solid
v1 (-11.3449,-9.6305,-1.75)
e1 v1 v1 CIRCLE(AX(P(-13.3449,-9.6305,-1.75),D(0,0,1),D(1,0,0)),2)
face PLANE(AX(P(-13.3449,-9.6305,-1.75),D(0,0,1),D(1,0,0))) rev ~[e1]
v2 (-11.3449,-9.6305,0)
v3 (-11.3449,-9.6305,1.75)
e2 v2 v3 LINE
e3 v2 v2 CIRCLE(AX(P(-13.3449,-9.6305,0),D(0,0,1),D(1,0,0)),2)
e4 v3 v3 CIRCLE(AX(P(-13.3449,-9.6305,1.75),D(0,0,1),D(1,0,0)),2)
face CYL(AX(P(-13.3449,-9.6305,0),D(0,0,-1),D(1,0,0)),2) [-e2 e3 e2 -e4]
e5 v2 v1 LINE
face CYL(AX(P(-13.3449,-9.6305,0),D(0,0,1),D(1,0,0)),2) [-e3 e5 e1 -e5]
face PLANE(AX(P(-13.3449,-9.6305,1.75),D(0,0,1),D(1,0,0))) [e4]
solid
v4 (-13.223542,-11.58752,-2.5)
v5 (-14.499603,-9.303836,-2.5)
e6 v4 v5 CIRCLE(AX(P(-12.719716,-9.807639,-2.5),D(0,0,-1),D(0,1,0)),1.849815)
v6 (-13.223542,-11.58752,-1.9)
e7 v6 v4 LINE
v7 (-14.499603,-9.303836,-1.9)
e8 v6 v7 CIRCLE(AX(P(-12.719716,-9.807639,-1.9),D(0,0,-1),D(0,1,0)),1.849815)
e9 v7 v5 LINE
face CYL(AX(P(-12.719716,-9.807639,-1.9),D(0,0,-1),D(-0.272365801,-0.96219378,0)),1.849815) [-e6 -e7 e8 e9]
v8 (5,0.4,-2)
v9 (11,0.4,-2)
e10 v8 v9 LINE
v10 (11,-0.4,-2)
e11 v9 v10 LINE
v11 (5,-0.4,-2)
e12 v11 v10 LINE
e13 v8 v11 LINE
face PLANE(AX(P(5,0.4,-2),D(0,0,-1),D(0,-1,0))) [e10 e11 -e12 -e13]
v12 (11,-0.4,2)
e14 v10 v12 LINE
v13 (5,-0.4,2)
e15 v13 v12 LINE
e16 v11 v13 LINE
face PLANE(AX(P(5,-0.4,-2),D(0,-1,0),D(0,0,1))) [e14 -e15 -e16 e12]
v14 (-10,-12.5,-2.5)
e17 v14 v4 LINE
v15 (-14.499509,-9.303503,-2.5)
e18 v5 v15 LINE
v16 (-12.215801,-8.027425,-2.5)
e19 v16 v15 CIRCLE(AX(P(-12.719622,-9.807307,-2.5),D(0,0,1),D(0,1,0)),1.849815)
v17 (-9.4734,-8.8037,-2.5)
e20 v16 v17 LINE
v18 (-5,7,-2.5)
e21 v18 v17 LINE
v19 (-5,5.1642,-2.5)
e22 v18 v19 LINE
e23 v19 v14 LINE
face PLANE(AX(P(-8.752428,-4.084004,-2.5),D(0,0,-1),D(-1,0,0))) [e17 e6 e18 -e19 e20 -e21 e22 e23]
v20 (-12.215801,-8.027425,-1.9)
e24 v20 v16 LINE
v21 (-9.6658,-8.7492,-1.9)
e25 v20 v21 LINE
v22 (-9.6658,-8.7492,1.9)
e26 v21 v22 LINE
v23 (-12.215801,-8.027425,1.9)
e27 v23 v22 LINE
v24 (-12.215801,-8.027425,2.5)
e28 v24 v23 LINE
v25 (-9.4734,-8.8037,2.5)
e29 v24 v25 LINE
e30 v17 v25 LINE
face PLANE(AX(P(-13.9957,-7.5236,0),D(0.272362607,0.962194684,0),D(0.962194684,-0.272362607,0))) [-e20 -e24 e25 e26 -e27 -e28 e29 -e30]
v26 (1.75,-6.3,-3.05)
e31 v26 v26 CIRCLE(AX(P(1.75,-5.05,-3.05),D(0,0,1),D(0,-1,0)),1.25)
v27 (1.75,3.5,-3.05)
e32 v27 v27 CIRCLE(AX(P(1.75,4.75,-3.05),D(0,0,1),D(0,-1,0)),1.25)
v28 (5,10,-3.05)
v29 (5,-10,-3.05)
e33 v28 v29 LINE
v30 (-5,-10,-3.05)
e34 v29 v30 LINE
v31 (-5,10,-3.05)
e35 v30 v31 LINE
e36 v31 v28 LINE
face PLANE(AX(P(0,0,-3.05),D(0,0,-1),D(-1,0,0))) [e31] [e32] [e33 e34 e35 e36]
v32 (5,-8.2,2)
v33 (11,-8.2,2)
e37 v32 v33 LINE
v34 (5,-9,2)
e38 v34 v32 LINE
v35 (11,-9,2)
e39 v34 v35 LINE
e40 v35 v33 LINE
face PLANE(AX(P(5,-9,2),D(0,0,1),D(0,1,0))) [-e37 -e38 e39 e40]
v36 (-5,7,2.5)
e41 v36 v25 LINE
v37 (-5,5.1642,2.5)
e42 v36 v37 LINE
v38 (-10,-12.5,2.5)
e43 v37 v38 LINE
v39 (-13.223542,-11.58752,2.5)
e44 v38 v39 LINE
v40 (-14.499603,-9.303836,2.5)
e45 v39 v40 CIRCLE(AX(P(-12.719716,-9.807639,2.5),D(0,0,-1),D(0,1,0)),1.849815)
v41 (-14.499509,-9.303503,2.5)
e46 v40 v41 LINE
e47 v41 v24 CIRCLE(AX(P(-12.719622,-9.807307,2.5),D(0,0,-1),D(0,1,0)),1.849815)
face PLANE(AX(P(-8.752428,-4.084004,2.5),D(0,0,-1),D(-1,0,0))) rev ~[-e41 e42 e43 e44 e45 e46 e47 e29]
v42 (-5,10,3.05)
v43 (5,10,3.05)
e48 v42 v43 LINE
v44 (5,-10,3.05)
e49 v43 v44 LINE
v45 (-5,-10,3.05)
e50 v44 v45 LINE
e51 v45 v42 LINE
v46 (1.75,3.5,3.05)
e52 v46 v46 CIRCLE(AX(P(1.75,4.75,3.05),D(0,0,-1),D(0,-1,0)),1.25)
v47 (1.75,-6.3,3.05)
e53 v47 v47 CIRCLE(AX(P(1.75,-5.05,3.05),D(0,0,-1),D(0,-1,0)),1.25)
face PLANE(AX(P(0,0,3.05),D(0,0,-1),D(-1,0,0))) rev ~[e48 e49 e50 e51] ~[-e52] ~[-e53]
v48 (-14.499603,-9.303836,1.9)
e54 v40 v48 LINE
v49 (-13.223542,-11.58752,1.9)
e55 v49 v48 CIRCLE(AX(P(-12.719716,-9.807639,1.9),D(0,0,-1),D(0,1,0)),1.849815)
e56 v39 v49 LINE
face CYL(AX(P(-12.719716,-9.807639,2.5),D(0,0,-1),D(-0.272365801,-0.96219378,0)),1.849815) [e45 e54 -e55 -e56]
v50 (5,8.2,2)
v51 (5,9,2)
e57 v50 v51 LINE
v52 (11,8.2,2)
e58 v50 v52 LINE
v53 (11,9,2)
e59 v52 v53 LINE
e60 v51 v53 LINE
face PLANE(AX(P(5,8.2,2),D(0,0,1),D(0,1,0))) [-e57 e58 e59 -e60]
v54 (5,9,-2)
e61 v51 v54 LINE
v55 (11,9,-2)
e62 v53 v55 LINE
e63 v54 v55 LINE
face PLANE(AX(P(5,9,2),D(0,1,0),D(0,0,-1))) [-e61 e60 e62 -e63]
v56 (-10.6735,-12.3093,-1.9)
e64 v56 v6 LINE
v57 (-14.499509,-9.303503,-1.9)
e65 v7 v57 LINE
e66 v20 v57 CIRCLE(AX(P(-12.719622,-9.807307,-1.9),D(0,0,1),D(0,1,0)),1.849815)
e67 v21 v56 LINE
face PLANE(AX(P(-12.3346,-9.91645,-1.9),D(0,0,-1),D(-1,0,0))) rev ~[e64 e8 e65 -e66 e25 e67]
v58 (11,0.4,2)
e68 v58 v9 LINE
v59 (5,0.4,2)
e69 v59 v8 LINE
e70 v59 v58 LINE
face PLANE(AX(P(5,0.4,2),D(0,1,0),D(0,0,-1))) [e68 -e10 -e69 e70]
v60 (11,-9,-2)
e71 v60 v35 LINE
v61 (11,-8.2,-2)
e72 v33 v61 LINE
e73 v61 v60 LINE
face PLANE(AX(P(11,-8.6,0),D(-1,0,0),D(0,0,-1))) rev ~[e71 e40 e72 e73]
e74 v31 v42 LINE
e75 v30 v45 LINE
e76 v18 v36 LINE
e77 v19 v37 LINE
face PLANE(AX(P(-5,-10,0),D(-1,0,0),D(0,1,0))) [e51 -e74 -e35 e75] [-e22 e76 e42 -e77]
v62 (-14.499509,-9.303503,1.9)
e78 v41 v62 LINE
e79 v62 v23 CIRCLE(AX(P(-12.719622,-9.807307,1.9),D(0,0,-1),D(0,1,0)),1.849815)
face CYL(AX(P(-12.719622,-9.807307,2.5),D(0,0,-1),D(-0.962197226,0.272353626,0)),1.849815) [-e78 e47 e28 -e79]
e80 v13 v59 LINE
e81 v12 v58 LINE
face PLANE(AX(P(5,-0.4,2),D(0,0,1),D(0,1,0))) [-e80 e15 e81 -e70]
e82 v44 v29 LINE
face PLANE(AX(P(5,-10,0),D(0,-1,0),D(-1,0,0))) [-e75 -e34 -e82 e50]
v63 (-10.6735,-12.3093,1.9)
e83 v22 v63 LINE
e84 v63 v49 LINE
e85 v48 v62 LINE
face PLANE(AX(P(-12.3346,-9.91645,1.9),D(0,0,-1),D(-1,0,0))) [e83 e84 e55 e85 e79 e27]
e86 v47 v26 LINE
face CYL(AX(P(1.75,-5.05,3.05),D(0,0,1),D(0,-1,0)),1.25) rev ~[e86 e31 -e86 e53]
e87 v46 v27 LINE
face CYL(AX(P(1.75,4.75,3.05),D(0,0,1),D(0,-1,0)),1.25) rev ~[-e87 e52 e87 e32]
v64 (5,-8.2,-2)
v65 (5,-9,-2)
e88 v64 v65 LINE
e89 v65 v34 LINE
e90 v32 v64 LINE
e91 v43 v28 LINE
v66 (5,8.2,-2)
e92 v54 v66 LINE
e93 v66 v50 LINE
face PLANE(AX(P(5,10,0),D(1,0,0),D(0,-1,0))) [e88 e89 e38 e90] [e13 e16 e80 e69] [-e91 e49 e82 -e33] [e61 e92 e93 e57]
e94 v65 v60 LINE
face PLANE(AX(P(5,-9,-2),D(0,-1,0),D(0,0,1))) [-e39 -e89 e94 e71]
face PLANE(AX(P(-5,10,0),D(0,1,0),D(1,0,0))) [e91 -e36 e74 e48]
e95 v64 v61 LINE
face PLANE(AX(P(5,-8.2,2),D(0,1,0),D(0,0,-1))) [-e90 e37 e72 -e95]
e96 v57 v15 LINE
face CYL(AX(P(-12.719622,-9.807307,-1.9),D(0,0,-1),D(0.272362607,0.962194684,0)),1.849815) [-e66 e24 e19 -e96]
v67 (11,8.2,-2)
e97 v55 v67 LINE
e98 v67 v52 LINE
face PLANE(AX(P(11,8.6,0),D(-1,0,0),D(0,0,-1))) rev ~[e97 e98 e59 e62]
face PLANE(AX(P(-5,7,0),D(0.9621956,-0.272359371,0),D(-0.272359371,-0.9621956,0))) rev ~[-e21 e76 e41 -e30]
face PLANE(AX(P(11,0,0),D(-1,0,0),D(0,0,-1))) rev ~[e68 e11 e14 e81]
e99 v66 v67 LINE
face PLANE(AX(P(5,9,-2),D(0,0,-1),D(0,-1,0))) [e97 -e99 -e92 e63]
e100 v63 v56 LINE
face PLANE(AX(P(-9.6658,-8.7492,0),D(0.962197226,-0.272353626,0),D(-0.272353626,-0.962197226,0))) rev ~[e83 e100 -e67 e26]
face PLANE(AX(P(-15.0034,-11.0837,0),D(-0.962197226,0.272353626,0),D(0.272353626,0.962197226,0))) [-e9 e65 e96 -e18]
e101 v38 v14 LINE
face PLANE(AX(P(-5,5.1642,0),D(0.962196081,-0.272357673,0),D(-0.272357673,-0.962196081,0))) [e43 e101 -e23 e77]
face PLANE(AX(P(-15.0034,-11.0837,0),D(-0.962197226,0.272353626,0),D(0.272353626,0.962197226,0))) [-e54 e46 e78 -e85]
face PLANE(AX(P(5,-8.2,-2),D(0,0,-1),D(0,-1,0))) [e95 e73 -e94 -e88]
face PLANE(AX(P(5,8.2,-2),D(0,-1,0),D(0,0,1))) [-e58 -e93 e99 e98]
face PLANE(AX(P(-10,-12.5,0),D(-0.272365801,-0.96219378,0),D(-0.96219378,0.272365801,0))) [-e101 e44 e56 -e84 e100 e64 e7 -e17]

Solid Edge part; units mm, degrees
sketch "Sketch1" plane through (0, 0, 0) normal (0, 0, 1) x (1, 0, 0)
  line L0 (-5, 10) -> (5, 10)
  line L1 (5, 10) -> (5, -10)
  line L2 (5, -10) -> (-5, -10)
  line L3 (-5, -10) -> (-5, 10)
  dimension "D1" = 10
  dimension "D2" = 20
extrude "Protrusion1" add sketch "Sketch1" along normal mid plane 6.1
sketch "Sketch2" plane through (0, 0, 0) normal (0, 0, 1) x (1, 0, 0)
  line L0 (-5, 5.1642) -> (-10, -12.5)
  line L1 (-10, -12.5) -> (-15.0034, -11.0837)
  line L2 (-15.0034, -11.0837) -> (-13.9957, -7.5236)
  line L3 (-13.9957, -7.5236) -> (-9.4734, -8.8037)
  line L4 (-5, 7) -> (-9.4734, -8.8037)
  line L5 (-5, 7) -> (-5, 5.1642)
  dimension "D1" = 0.5
  dimension "D2" = 5
  dimension "D3" = 5.2
  dimension "D4" = 3.7
  dimension "D5" = 3
  dimension "D6" = 19.5
  dimension "D7" = 2.5
extrude "Extrusionsausprägung_2" add sketch "Sketch2" along normal mid plane 5
sketch "Sketch3" plane through (0, 0, 0) normal (0, 0, 1) x (1, 0, 0)
  line L0 (-9.6658, -8.7492) -> (-10.6735, -12.3093)
  line L1 (-10.6735, -12.3093) -> (-15.0034, -11.0837)
  line L2 (-15.0034, -11.0837) -> (-13.9957, -7.5236)
  line L3 (-13.9957, -7.5236) -> (-9.6658, -8.7492)
  dimension "D1" = 4.5
extrude "Extrusionsausschnitt_1" cut sketch "Sketch3" along normal mid plane 3.8
sketch "Sketch4" plane through (0, 0, 0) normal (0, 0, 1) x (1, 0, 0)
  circle A0 centre (-13.3449, -9.6305) radius 2
  dimension "D1" = 4
  dimension "D2" = 4
  dimension "D3" = 1.85
extrude "Extrusionsausprägung_3" add sketch "Sketch4" along normal mid plane 3.5
fillet "Verrundung_1" radius 1.85 4 edges at (-13.9957, -7.5236, 2.2) (-13.9957, -7.5236, -2.2) (-15.0034, -11.0837, 2.2) (-15.0034, -11.0837, -2.2)
hole "Bohrung_1" at (1.75, 4.75, 3.05) direction (0, 0, -1) diameter 2.5 end up to next
hole "Hole1" at (1.75, -5.05, 3.05) direction (0, 0, -1) diameter 2.5 end up to next
sketch "Sketch5" plane through (5, 0, 0) normal (1, 0, 0) x (0, -1, 0)
  line L0 (-9, 2) -> (-8.2, 2)
  line L1 (-8.2, 2) -> (-8.2, -2)
  line L2 (-8.2, -2) -> (-9, -2)
  line L3 (-9, -2) -> (-9, 2)
  line L4 (-0.4, 2) -> (0.4, 2)
  line L5 (0.4, 2) -> (0.4, -2)
  line L6 (0.4, -2) -> (-0.4, -2)
  line L7 (-0.4, -2) -> (-0.4, 2)
  line L8 (8.2, 2) -> (9, 2)
  line L9 (9, 2) -> (9, -2)
  line L10 (9, -2) -> (8.2, -2)
  line L11 (8.2, -2) -> (8.2, 2)
  dimension "D1" = 1
  dimension "D2" = 0.8
  dimension "D3" = 0.8
  dimension "D4" = 1
  dimension "D5" = 0.8
  dimension "D6" = 4
extrude "Extrusionsausprägung_4" add sketch "Sketch5" along normal blind 6
